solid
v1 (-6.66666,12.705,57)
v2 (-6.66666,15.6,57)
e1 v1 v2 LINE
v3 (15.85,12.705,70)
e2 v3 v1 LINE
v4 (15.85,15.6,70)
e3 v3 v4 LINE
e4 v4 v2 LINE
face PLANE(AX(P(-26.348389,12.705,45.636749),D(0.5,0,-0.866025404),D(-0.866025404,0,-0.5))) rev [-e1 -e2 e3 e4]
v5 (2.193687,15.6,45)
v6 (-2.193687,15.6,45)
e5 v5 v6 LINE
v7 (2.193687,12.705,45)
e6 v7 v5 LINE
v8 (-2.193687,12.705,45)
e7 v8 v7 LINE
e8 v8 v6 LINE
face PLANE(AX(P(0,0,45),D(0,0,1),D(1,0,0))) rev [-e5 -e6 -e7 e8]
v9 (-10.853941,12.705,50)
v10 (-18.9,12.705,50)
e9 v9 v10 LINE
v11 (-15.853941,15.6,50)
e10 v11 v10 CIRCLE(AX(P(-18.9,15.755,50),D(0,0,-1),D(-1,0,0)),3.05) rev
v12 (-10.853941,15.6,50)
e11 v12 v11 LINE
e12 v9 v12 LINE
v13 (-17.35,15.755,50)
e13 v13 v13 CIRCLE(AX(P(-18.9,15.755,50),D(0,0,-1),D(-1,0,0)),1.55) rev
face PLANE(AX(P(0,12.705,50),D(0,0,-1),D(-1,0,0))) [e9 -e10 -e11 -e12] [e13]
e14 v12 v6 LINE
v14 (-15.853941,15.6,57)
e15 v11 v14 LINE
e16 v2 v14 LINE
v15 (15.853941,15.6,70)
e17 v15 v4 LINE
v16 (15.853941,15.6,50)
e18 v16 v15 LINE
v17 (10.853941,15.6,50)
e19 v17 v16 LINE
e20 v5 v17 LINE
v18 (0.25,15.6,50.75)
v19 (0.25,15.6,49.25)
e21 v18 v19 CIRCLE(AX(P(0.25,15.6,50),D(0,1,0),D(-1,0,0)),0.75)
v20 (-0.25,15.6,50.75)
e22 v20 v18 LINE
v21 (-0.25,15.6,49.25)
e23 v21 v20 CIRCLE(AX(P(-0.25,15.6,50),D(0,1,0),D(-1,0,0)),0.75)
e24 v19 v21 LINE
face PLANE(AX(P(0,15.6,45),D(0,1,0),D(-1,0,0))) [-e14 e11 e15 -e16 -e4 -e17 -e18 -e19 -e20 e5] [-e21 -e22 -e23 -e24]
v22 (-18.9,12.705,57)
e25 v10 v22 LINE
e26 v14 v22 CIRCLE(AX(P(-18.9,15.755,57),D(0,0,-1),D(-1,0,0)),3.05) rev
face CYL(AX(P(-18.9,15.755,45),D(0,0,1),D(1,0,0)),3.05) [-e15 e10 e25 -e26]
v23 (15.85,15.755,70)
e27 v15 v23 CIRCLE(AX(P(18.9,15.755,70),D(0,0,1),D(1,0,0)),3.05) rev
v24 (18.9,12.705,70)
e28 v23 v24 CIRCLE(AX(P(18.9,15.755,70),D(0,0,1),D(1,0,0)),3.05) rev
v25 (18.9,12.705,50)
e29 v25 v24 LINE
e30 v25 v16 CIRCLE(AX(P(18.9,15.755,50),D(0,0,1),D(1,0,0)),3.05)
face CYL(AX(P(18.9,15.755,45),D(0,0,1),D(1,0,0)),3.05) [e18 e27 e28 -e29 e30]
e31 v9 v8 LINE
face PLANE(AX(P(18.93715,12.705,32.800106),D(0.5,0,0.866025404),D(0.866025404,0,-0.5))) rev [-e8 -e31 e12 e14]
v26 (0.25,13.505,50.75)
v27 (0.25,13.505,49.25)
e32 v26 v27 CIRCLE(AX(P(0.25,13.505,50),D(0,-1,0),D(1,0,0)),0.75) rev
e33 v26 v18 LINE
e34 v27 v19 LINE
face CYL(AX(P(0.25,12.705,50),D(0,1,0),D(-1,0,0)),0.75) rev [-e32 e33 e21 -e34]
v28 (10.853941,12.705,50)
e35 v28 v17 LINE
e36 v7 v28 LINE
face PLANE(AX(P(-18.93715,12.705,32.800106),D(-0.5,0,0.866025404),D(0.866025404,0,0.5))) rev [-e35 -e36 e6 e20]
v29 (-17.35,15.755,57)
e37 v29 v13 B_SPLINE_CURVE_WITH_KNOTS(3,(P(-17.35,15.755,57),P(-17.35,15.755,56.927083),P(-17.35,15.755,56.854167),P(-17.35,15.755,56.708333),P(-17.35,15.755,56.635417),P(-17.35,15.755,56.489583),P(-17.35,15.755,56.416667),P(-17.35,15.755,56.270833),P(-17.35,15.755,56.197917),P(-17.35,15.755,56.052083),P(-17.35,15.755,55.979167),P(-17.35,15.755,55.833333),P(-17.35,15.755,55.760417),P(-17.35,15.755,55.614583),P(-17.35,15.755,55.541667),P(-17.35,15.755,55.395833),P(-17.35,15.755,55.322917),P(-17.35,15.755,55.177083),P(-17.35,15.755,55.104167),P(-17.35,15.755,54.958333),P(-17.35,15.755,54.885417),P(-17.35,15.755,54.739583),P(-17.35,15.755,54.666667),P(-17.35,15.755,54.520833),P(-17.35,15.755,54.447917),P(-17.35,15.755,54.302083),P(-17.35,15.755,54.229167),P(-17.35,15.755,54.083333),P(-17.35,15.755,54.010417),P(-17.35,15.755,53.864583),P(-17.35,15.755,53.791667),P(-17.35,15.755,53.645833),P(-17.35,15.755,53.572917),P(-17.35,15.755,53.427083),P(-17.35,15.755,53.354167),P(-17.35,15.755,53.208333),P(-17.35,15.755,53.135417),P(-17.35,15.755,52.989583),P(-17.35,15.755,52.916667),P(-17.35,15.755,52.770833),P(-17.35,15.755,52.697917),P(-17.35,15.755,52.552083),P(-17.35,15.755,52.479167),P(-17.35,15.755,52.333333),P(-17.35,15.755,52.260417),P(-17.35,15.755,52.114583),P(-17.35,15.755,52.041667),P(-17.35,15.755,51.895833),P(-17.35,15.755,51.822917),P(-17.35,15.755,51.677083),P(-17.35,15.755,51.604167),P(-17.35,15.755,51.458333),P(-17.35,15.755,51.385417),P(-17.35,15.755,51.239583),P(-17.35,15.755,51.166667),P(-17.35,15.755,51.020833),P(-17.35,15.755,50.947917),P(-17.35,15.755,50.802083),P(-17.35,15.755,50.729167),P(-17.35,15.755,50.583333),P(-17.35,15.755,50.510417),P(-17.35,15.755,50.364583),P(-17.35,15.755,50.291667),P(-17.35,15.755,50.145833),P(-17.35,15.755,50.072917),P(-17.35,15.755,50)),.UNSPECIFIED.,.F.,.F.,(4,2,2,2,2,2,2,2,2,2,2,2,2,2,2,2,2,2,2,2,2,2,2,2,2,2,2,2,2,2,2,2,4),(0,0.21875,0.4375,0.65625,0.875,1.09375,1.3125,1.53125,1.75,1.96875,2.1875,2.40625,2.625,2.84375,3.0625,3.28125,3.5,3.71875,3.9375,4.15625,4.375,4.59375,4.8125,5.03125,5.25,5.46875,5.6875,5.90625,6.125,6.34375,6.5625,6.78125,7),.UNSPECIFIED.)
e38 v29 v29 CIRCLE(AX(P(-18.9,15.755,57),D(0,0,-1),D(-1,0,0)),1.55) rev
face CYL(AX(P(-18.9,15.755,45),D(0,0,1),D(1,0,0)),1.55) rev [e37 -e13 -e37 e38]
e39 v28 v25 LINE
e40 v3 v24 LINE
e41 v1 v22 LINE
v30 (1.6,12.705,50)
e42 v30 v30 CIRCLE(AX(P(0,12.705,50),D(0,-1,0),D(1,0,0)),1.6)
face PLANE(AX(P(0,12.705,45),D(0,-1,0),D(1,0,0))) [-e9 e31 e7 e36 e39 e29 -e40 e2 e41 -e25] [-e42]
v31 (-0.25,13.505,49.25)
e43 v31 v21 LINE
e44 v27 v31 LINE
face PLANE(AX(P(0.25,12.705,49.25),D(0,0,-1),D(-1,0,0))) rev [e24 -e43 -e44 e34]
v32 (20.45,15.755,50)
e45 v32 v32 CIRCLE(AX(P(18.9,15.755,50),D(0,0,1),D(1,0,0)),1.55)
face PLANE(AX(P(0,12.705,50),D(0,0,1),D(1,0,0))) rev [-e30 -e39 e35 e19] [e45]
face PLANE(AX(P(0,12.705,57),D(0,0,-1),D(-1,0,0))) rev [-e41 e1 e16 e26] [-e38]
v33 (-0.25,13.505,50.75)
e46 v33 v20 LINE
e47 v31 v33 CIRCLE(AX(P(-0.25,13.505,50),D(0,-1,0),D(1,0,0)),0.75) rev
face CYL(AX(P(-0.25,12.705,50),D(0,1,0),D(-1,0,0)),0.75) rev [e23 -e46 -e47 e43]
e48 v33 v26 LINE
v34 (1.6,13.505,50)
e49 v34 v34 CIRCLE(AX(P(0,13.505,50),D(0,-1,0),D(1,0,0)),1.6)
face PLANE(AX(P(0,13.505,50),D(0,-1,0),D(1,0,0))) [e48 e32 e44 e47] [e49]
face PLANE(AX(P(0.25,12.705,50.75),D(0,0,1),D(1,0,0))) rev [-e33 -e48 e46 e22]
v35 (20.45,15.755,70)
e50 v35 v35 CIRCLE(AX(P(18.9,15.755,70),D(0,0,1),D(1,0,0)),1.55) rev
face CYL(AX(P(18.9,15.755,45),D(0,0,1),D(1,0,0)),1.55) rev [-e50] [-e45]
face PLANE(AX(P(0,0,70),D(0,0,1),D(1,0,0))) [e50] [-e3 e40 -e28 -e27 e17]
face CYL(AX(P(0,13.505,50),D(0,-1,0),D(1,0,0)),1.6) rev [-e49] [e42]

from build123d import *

# Parameters (mm, degrees)
SKETCH_2_R           = 3.05
SKETCH_2_R_2         = 1.55
EXTRUDE_1_DEPTH      = 25
CUT_EXTRUDE_3_DEPTH  = 74.430746455
SKETCH_8_R           = 1.6
CUT_EXTRUDE_4_DEPTH  = 0.8
CUT_EXTRUDE_START    = -2.895
CUT_EXTRUDE_10_DEPTH = 6.1


# Read off the part's stored shape, not the designer's step: the extrude step
with BuildPart() as part:
    # 草图2 → 凸台-拉伸1 (new body)
    # profile 1 of 4: a face of its own
    with BuildSketch(Plane.XY.offset(70)):
        with Locations((-18.9, 15.755)):
            Circle(SKETCH_2_R)
        with Locations((-18.9, 15.755)):
            Circle(SKETCH_2_R_2, mode=Mode.SUBTRACT)
    # profile 2 of 4: a face of its own
    with BuildSketch(Plane.XY.offset(70)):
        with BuildLine():
            Line((0, 12.705), (0, 15.6))
            Line((0, 15.6), (-15.853941071, 15.6))
            ThreePointArc((-15.853941071, 15.6), (-16.798839606, 13.544202633), (-18.9, 12.705))
            Line((-18.9, 12.705), (0, 12.705))
        make_face()
    # profile 3 of 4: a face of its own
    with BuildSketch(Plane.XY.offset(70)):
        with BuildLine():
            Line((15.853941071, 15.6), (0, 15.6))
            Line((0, 15.6), (0, 12.705))
            Line((0, 12.705), (18.9, 12.705))
            ThreePointArc((18.9, 12.705), (16.798839606, 13.544202633), (15.853941071, 15.6))
        make_face()
    # profile 4 of 4: a face of its own
    with BuildSketch(Plane.XY.offset(70)):
        with Locations((18.9, 15.755)):
            Circle(SKETCH_2_R)
        with Locations((18.9, 15.755)):
            Circle(SKETCH_2_R_2, mode=Mode.SUBTRACT)
    extrude(amount=-EXTRUDE_1_DEPTH)

    # 草图7 → 切除-拉伸3 (cut, through all)
    with BuildSketch(Plane(origin=(0, 15.6, 0), x_dir=(1, 0, 0), z_dir=(0, 1, 0))):
        with BuildLine():
            Line((0.25, -50.75), (-0.25, -50.75))
            ThreePointArc((-0.25, -50.75), (-1, -50), (-0.25, -49.25))
            Line((-0.25, -49.25), (0.25, -49.25))
            ThreePointArc((0.25, -49.25), (1, -50), (0.25, -50.75))
        make_face()
    extrude(amount=-CUT_EXTRUDE_3_DEPTH, mode=Mode.SUBTRACT)

    # 草图8 → 切除-拉伸4 (cut)
    with BuildSketch(Plane.XZ.offset(-12.705)):
        with Locations((0, 50)):
            Circle(SKETCH_8_R)
    extrude(amount=-CUT_EXTRUDE_4_DEPTH, mode=Mode.SUBTRACT)

    # 切除-拉伸10 outline → 切除-拉伸10 (cut)
    with BuildSketch(Plane(origin=(0, 15.6, 0), x_dir=(1, 0, 0), z_dir=(0, 1, 0)).offset(CUT_EXTRUDE_START)):
        Polygon((-6.666660498, -57), (-21.95, -57), (-21.95, -70), (15.85, -70), align=None)
        Polygon((-21.95, -50), (-10.853941071, -50), (-2.193687033, -45), (-21.95, -45), align=None)
        Polygon((10.853941071, -50), (21.95, -50), (21.95, -45), (2.193687033, -45), align=None)
    extrude(amount=CUT_EXTRUDE_10_DEPTH, mode=Mode.SUBTRACT)


solid = part.part
